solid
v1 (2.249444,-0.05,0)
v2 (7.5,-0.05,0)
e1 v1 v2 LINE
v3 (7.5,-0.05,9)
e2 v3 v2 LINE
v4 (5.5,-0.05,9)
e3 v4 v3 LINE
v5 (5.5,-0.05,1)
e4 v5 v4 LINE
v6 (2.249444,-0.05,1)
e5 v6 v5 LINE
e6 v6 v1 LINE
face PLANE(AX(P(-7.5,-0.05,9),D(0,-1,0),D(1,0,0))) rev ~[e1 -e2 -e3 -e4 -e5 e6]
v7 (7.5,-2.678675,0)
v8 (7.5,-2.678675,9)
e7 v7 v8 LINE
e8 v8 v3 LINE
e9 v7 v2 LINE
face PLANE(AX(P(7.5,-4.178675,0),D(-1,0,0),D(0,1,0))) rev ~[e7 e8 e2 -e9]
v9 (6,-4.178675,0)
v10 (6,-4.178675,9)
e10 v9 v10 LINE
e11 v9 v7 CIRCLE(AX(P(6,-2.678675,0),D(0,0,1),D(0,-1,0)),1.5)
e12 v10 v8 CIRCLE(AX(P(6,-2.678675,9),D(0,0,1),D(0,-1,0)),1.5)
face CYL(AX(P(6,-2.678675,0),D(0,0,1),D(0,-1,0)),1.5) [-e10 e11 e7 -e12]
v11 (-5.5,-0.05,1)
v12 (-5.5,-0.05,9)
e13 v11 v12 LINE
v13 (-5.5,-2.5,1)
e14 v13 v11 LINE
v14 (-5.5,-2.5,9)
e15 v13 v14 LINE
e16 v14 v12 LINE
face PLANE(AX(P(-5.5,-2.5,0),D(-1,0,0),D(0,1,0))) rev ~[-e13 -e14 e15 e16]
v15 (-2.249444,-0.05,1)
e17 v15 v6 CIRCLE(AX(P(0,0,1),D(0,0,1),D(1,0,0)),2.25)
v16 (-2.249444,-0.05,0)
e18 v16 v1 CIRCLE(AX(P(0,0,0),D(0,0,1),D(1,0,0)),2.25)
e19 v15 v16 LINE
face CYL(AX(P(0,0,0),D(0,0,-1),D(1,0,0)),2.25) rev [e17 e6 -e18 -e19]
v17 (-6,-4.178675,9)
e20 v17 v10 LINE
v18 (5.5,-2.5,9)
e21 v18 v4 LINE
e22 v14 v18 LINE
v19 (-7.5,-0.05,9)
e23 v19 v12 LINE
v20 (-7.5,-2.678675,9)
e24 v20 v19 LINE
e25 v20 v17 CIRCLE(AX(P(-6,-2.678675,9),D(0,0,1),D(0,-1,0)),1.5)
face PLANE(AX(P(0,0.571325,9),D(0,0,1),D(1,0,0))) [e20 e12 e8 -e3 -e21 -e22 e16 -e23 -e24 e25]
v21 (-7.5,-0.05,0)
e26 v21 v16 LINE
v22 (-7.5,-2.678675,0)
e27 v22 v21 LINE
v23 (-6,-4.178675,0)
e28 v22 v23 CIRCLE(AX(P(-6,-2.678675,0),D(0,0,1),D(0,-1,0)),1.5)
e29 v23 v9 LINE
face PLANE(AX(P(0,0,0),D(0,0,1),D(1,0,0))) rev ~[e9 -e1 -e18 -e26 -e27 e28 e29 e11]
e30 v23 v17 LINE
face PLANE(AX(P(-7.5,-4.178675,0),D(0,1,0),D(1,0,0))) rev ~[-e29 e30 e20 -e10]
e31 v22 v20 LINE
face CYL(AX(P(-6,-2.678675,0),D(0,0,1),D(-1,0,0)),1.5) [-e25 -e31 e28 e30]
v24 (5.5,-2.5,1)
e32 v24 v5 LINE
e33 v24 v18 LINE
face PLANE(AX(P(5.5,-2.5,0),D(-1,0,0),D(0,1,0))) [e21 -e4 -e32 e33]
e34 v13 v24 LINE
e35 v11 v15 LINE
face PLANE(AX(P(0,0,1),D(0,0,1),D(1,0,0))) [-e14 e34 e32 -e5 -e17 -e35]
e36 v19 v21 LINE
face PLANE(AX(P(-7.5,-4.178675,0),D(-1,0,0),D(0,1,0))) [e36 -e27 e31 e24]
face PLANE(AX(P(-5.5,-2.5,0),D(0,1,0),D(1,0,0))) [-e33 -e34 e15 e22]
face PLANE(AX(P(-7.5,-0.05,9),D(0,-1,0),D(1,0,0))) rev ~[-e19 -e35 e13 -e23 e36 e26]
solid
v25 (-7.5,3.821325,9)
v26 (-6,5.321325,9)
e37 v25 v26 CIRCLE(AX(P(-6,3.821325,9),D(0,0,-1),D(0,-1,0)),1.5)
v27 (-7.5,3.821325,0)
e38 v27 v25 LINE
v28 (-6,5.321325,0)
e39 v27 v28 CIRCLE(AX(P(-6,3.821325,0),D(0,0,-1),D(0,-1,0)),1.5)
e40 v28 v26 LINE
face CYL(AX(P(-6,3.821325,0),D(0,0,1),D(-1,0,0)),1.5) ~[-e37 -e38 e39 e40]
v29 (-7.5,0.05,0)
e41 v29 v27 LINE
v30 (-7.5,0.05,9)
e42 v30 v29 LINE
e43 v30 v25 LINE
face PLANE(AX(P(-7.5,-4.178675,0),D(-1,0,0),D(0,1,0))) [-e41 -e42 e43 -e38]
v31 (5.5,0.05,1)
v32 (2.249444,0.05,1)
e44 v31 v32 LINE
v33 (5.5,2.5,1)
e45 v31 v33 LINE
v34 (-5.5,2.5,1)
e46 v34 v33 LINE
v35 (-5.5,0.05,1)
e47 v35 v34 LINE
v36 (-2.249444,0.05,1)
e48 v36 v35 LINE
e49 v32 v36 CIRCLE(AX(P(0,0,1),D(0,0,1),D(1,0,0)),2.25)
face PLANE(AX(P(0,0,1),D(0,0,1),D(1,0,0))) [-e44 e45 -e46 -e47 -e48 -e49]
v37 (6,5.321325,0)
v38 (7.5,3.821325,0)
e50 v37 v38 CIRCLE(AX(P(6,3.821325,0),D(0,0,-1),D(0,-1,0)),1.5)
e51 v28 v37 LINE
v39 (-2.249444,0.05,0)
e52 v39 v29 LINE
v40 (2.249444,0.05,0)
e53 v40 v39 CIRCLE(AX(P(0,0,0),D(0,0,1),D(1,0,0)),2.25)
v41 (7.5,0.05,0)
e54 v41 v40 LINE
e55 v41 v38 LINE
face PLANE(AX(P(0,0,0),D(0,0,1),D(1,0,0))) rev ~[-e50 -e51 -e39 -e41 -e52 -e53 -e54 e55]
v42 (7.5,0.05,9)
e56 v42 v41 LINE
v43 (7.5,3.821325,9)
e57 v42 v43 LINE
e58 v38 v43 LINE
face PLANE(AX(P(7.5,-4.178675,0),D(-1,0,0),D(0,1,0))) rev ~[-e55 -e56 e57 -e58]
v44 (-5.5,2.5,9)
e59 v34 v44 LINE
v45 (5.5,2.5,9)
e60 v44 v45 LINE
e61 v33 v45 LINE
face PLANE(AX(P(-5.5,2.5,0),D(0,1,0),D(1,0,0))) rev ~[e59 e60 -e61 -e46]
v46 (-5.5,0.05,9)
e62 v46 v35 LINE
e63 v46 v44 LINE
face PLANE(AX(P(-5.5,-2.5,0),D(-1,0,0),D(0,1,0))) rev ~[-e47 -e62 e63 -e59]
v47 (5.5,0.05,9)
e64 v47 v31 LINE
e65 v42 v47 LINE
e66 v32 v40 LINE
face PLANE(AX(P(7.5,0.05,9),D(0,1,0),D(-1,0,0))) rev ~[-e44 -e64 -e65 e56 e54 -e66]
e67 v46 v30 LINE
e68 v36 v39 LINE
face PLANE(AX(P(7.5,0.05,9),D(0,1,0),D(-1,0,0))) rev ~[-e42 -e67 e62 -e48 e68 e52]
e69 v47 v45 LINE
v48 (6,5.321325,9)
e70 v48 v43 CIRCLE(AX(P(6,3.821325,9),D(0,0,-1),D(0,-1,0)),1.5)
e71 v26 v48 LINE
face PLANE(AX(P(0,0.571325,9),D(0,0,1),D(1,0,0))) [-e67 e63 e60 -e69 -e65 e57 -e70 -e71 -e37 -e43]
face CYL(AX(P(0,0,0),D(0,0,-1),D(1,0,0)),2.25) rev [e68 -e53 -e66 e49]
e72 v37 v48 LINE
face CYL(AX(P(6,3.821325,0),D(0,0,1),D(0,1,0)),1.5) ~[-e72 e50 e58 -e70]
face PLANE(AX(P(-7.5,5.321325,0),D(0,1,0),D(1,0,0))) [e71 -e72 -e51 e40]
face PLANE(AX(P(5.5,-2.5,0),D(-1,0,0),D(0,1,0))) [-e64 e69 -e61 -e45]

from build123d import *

# Parameters (mm, degrees)
F0_W     = 15
F0_H     = 9.5
F0_W_2   = 11
F0_H_2   = 5
F1_DEPTH = 9
F2_R     = 1.5
F0_R     = 2.25
F3_DEPTH = 1
F4_W     = 2
F4_H     = 0.1
F4_W_2   = 11
F5_DEPTH = 25


# Not quite as in the source:
# - a feature names something its author has since deleted; it is built from what else it names


with BuildPart() as f1:
    # F0 (on Top) → F1 (new body)
    with BuildSketch(Plane.XY):
        with Locations((0, 0.571324781)):
            Rectangle(F0_W, F0_H)
        Rectangle(F0_W_2, F0_H_2, mode=Mode.SUBTRACT)
    extrude(amount=F1_DEPTH)

    # F2
    f2_edges = [f1.edges().sort_by_distance(p)[0] for p in [
        (-7.5, 5.321325, 4.5),
        (7.5, 5.321325, 4.5),
        (7.5, -4.178675, 4.5),
        (-7.5, -4.178675, 4.5),
    ]]
    fillet(f2_edges, radius=F2_R)

    # F0 (on Top) → F3 (join)
    with BuildSketch(Plane.XY):
        Rectangle(F0_W_2, F0_H_2)
        Circle(F0_R, mode=Mode.SUBTRACT)
    extrude(amount=F3_DEPTH)

    # F4 (on face) → F5 (cut)
    with BuildSketch(Plane.XY.offset(9)):
        with Locations((-6.5, 0)):
            Rectangle(F4_W, F4_H)
        Rectangle(F4_W_2, F4_H)
        with Locations((6.5, 0)):
            Rectangle(F4_W, F4_H)
    extrude(amount=-F5_DEPTH, mode=Mode.SUBTRACT)


solid = f1.part
